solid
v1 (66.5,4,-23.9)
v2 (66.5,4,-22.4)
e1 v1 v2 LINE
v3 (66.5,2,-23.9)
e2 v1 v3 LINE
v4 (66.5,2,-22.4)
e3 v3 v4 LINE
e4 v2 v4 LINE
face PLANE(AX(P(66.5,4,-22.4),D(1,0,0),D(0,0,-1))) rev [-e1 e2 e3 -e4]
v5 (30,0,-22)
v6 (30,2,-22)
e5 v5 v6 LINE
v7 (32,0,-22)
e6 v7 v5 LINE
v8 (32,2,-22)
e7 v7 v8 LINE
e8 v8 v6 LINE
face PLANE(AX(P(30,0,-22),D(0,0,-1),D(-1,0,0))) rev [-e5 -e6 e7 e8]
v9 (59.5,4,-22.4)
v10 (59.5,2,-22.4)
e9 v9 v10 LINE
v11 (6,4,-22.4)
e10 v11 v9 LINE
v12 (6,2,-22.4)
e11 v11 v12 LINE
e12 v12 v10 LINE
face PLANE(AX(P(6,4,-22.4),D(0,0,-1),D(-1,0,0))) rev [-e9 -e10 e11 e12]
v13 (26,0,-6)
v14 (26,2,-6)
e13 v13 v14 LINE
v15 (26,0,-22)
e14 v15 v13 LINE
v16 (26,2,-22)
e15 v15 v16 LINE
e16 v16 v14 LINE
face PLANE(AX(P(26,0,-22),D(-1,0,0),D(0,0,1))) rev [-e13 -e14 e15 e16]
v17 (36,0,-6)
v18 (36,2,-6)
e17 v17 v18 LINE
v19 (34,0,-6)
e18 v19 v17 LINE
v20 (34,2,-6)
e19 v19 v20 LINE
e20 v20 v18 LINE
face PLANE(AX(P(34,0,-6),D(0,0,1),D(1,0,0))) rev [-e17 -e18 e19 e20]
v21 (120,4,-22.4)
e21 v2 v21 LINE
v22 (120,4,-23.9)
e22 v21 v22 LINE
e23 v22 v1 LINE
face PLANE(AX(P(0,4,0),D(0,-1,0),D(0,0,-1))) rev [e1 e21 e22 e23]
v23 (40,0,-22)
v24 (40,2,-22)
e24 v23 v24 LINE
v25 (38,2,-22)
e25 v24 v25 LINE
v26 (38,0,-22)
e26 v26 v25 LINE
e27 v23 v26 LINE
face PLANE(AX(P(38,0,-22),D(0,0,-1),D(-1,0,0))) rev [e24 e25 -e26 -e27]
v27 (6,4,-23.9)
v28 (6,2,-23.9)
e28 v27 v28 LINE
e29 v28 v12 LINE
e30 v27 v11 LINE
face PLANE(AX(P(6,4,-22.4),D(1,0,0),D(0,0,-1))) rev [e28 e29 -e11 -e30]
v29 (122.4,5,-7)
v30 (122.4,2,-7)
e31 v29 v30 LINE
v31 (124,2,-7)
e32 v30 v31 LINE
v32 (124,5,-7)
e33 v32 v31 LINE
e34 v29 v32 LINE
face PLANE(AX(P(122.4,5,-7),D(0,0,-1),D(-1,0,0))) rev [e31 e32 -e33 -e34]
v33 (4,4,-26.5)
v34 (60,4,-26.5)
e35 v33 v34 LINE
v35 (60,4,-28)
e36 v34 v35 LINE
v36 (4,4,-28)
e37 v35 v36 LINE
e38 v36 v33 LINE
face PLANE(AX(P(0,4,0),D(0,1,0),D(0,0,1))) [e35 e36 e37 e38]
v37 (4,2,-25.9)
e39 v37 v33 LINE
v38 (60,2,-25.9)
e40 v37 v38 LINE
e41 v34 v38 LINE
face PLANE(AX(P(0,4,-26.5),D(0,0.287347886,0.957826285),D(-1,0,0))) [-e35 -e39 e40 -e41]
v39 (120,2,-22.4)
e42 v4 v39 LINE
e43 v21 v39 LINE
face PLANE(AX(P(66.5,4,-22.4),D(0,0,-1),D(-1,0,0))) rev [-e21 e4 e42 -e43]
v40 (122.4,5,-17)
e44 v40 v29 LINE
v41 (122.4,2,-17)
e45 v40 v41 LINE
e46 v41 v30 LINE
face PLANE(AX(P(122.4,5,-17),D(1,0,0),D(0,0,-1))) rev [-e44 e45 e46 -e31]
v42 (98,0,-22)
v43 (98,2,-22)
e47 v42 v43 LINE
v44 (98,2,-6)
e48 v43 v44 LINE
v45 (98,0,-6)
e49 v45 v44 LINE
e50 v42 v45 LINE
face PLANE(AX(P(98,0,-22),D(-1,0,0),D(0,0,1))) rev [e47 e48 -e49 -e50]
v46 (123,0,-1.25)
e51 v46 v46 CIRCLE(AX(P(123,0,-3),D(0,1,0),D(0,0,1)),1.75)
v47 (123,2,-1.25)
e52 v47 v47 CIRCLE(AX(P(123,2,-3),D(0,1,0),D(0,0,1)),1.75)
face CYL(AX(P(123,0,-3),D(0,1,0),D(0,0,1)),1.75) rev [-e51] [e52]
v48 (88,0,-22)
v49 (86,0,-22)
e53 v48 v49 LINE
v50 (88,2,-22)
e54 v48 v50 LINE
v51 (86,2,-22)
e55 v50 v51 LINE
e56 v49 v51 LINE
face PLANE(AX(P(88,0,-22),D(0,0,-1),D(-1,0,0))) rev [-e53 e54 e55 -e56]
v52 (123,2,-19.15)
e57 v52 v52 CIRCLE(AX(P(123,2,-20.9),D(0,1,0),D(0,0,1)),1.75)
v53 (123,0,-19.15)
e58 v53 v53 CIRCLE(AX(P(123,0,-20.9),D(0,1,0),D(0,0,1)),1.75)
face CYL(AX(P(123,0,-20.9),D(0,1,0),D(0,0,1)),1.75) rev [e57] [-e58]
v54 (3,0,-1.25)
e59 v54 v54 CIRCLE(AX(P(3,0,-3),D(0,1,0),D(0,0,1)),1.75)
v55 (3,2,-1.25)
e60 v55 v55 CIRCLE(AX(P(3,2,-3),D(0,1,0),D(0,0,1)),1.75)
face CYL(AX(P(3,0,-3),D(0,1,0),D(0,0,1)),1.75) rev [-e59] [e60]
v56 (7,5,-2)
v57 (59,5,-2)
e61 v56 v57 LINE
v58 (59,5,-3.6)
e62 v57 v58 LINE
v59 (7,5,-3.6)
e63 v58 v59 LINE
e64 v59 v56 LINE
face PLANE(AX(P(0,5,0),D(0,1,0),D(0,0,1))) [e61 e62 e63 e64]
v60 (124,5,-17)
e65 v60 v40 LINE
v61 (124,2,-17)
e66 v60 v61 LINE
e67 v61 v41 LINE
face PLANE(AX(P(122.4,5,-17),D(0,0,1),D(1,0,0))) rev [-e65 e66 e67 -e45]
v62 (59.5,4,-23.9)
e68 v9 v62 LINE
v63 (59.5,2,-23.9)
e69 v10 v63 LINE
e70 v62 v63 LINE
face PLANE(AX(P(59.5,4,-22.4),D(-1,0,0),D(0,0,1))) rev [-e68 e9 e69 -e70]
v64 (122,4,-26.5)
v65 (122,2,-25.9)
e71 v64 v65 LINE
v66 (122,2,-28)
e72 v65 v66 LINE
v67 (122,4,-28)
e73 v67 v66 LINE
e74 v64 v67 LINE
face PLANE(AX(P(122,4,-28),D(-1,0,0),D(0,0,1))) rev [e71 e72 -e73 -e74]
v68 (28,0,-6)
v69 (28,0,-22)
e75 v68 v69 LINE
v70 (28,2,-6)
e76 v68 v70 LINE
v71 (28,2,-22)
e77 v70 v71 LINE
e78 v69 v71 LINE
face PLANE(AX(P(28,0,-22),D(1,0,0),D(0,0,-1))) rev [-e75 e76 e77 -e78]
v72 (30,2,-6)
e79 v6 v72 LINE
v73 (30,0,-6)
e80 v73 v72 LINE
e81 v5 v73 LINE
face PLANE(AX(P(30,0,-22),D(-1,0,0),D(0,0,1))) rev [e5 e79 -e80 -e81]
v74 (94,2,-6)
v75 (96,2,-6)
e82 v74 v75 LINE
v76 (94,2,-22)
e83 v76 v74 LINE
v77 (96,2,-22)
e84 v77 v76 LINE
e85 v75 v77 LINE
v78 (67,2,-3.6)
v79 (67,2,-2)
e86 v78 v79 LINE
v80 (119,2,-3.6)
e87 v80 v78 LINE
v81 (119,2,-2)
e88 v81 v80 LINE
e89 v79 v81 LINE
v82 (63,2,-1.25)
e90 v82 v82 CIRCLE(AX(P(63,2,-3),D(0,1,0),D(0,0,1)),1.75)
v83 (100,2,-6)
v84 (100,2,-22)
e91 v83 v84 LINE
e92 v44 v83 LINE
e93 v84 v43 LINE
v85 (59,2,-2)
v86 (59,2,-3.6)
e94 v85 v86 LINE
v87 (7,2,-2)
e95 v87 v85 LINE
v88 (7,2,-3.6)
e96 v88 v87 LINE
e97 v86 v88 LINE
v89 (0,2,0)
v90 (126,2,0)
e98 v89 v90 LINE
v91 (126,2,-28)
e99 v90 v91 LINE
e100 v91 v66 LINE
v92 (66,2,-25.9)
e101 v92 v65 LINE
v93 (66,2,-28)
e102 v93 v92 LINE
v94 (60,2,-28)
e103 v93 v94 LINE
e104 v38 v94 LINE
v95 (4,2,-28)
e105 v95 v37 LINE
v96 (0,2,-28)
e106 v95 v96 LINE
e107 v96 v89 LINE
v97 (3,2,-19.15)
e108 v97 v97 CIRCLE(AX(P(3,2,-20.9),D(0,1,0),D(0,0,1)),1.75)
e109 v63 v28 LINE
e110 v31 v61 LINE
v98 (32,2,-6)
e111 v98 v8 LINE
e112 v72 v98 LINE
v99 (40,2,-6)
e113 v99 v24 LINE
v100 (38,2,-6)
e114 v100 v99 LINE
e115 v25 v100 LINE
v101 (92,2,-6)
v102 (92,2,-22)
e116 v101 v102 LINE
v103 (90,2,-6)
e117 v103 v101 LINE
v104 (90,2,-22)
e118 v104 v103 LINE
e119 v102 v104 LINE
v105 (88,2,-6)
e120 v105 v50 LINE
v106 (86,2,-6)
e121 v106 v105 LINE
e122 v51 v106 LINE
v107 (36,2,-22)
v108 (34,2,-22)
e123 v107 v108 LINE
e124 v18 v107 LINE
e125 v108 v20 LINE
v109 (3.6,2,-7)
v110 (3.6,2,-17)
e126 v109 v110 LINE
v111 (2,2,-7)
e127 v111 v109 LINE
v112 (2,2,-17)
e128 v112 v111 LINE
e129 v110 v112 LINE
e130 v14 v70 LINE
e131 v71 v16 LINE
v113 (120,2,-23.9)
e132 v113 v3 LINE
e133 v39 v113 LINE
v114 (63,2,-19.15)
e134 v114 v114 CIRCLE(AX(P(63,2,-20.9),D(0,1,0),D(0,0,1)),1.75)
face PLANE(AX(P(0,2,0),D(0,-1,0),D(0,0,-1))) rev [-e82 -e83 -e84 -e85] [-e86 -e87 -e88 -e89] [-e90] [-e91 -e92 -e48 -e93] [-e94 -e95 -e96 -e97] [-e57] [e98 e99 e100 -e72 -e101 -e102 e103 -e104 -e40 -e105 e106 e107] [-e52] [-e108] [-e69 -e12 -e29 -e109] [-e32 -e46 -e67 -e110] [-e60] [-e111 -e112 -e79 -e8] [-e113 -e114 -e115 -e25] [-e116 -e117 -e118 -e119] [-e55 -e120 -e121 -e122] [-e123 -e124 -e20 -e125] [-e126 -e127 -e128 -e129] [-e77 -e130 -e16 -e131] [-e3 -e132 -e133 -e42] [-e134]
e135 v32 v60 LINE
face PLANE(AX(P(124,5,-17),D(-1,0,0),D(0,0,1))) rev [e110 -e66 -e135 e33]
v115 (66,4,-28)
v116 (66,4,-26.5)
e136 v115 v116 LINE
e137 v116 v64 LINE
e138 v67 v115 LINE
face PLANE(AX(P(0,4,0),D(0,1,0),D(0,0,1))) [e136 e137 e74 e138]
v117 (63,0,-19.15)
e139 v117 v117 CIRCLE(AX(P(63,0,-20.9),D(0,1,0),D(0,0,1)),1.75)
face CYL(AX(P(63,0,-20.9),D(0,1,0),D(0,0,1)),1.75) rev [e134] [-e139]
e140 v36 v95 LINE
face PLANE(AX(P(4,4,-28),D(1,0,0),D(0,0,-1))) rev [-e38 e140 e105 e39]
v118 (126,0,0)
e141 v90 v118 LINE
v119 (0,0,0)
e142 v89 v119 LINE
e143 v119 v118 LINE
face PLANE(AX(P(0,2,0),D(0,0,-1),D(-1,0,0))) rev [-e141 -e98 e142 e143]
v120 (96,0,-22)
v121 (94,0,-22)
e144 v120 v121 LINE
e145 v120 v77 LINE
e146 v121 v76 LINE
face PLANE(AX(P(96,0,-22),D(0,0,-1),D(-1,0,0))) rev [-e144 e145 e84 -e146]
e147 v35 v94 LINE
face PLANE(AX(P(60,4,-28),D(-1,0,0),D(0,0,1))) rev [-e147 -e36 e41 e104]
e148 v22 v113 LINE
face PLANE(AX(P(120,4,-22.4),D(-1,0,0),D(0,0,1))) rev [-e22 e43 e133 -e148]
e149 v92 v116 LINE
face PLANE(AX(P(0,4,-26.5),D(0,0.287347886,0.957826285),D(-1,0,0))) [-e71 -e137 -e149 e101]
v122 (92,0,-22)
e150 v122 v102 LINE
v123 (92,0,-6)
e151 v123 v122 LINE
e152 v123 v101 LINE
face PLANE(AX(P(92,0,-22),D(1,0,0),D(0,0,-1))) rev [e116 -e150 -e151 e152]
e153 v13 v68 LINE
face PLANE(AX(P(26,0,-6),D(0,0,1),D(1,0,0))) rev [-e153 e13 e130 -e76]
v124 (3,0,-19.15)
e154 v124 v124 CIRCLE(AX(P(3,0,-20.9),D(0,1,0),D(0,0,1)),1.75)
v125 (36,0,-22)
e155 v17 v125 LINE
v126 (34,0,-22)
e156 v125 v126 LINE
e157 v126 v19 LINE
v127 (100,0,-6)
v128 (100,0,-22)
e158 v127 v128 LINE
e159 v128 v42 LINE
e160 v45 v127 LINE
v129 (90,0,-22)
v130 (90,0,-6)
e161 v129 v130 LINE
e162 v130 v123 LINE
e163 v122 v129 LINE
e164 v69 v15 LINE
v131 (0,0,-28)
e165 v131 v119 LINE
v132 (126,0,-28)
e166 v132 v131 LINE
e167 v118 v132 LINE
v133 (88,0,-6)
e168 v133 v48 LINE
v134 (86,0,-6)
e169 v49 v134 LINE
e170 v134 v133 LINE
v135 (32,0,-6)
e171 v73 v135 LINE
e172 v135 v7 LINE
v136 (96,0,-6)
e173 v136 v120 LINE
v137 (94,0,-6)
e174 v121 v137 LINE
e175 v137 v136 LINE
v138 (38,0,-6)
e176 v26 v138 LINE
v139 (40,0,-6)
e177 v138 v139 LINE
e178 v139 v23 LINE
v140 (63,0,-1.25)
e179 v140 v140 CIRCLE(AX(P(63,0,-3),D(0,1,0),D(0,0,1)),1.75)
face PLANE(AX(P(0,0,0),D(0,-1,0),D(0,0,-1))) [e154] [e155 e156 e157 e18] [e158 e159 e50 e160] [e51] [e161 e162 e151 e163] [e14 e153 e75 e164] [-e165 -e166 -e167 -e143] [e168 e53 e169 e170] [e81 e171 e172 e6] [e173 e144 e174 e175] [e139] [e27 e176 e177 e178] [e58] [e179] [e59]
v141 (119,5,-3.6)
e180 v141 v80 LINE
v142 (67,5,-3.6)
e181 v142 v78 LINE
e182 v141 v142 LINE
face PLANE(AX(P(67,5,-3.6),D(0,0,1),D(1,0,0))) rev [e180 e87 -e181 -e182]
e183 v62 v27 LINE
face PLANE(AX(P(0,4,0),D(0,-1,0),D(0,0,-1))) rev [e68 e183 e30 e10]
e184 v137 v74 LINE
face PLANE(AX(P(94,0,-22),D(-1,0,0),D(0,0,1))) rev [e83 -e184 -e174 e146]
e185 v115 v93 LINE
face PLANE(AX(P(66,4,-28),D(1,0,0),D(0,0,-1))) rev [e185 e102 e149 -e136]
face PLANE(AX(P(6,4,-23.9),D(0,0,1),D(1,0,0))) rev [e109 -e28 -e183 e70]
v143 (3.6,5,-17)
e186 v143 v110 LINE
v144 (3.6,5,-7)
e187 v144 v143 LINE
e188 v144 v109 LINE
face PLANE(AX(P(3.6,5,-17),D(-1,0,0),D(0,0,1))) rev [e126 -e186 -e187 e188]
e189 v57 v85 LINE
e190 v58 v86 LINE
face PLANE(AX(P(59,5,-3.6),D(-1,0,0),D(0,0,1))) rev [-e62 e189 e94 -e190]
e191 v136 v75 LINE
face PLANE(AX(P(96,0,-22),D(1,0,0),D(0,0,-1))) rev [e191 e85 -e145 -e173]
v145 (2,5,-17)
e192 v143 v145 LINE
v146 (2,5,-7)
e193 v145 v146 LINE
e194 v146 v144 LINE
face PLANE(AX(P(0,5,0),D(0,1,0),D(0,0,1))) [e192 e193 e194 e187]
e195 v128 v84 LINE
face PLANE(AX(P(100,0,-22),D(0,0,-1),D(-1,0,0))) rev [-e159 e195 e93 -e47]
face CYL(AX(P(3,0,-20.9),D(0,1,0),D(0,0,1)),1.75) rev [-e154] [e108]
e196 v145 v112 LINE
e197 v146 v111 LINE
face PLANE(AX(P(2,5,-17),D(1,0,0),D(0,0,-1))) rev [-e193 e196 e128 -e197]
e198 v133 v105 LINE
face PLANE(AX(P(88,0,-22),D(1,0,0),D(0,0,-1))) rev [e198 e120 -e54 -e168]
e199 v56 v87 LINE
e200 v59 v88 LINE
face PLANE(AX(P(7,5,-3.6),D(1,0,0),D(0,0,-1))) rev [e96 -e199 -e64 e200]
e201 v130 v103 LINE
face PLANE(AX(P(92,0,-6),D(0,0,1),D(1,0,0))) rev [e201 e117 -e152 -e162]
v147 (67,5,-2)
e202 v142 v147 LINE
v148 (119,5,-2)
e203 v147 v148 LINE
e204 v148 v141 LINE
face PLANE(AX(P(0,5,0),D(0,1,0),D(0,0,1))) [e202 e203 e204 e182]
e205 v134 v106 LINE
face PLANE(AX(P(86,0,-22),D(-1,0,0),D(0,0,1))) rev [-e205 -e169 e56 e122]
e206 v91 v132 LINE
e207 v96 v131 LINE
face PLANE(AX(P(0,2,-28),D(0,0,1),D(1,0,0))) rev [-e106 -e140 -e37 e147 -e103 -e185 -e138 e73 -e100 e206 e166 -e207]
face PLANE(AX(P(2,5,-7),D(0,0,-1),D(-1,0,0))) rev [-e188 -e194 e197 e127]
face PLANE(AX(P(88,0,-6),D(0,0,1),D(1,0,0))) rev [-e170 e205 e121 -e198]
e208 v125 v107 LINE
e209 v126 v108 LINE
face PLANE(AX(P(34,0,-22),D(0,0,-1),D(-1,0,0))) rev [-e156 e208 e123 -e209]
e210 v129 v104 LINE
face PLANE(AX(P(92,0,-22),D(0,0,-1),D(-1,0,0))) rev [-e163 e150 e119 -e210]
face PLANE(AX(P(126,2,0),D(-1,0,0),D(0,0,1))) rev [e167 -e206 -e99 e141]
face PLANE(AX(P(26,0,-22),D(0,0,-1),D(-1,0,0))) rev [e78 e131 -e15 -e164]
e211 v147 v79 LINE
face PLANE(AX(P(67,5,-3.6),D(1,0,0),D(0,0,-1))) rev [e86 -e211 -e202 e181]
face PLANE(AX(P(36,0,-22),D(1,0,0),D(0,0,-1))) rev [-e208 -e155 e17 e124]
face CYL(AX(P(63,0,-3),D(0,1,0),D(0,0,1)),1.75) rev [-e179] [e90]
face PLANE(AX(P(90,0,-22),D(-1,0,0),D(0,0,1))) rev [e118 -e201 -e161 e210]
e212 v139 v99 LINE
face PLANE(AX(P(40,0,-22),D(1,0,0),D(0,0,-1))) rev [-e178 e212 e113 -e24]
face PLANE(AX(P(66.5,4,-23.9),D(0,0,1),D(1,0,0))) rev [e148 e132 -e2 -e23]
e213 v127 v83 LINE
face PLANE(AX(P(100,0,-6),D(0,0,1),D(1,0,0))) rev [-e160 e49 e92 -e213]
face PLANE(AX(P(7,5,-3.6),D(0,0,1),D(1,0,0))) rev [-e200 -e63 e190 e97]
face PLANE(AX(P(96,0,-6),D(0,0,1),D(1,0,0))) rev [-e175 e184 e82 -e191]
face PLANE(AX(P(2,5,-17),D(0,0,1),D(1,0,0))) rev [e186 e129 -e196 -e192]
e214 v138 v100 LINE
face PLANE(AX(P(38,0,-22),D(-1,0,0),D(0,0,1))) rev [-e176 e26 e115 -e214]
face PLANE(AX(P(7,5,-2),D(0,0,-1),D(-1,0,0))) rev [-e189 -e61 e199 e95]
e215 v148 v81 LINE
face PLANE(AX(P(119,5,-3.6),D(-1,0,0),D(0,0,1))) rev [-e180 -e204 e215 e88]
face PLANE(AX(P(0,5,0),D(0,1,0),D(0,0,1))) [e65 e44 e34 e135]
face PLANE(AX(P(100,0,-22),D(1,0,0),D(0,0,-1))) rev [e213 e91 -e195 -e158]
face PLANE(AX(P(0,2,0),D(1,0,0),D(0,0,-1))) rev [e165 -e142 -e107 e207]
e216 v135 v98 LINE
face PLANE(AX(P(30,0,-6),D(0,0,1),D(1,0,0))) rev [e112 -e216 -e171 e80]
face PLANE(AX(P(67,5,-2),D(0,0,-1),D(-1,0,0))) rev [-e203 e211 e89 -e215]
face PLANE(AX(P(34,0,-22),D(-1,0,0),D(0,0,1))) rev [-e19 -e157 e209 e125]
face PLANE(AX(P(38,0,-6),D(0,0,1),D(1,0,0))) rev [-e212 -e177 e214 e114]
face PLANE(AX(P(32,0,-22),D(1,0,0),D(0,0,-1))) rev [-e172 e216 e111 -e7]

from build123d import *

# Parameters (mm, degrees)
SKIZZE1_W                       = 126
SKIZZE1_H                       = 28
AUFSATZ_LINEAR_AUSTRAGEN1_DEPTH = 2
SKIZZE2_R                       = 1.75
SCHNITT_LINEAR_AUSTRAGEN1_DEPTH = 130.089116505
SKIZZE3_W                       = 2
SKIZZE3_H                       = 16
SCHNITT_LINEAR_AUSTRAGEN2_DEPTH = 130.089116505
LINEARES_MUSTER1_COUNT          = 4
LINEARES_MUSTER1_PITCH          = 4
SKIZZE4_W                       = 2
SKIZZE4_H                       = 16
SCHNITT_LINEAR_AUSTRAGEN3_DEPTH = 130.089116505
LINEARES_MUSTER2_COUNT          = 4
LINEARES_MUSTER2_PITCH          = 4
SKIZZE5_W                       = 1.6
SKIZZE5_H                       = 10
SKIZZE5_W_2                     = 52
SKIZZE5_H_2                     = 1.6
AUFSATZ_LINEAR_AUSTRAGEN2_DEPTH = 3
SKIZZE6_W                       = 53.5
SKIZZE6_H                       = 1.5
AUFSATZ_LINEAR_AUSTRAGEN3_DEPTH = 2
SKIZZE7_W                       = 56
SKIZZE7_H                       = 2.1
AUFSATZ_LINEAR_AUSTRAGEN4_DEPTH = 2
FASE1_SIZE                      = 2
FASE1_SIZE_2                    = 0.6


with BuildPart() as part:
    # Skizze1 → Aufsatz-Linear austragen1 (new body)
    with BuildSketch(Plane(origin=(0, 0, 0), x_dir=(1, 0, 0), z_dir=(0, 1, 0))):
        with Locations((63, 14)):
            Rectangle(SKIZZE1_W, SKIZZE1_H)
    extrude(amount=AUFSATZ_LINEAR_AUSTRAGEN1_DEPTH)

    # Skizze2 → Schnitt-Linear austragen1 (cut, through all)
    with BuildSketch(Plane(origin=(0, 2, 0), x_dir=(1, 0, 0), z_dir=(0, 1, 0))):
        with Locations(Location((3, 3, 0), (0, 0, 270))):
            Circle(SKIZZE2_R)
        with Locations(Location((3, 20.9, 0), (0, 0, 270))):
            Circle(SKIZZE2_R)
        with Locations(Location((63, 3, 0), (0, 0, 270))):
            Circle(SKIZZE2_R)
        with Locations(Location((63, 20.9, 0), (0, 0, 270))):
            Circle(SKIZZE2_R)
        with Locations(Location((123, 20.9, 0), (0, 0, 270))):
            Circle(SKIZZE2_R)
        with Locations(Location((123, 3, 0), (0, 0, 270))):
            Circle(SKIZZE2_R)
    extrude(amount=-SCHNITT_LINEAR_AUSTRAGEN1_DEPTH, mode=Mode.SUBTRACT)

    # Skizze3 → Schnitt-Linear austragen2 (cut, through all)
    with BuildSketch(Plane(origin=(0, 2, 0), x_dir=(1, 0, 0), z_dir=(0, 1, 0))):
        with Locations((27, 14)):
            Rectangle(SKIZZE3_W, SKIZZE3_H)
    schnitt_linear_austragen2 = extrude(amount=-SCHNITT_LINEAR_AUSTRAGEN2_DEPTH, mode=Mode.SUBTRACT)

    # Lineares Muster1: Schnitt-Linear austragen2 ×4
    with Locations(*[(i * LINEARES_MUSTER1_PITCH, 0, 0) for i in range(1, LINEARES_MUSTER1_COUNT)]):
        add(schnitt_linear_austragen2, mode=Mode.SUBTRACT)

    # Skizze4 → Schnitt-Linear austragen3 (cut, through all)
    with BuildSketch(Plane(origin=(0, 2, 0), x_dir=(1, 0, 0), z_dir=(0, 1, 0))):
        with Locations((99, 14)):
            Rectangle(SKIZZE4_W, SKIZZE4_H)
    schnitt_linear_austragen3 = extrude(amount=-SCHNITT_LINEAR_AUSTRAGEN3_DEPTH, mode=Mode.SUBTRACT)

    # Lineares Muster2: Schnitt-Linear austragen3 ×4
    with Locations(*[(-i * LINEARES_MUSTER2_PITCH, 0, 0) for i in range(1, LINEARES_MUSTER2_COUNT)]):
        add(schnitt_linear_austragen3, mode=Mode.SUBTRACT)

    # Skizze5 → Aufsatz-Linear austragen2 (add)
    with BuildSketch(Plane(origin=(0, 2, 0), x_dir=(1, 0, 0), z_dir=(0, 1, 0))):
        with Locations((2.8, 12)):
            Rectangle(SKIZZE5_W, SKIZZE5_H)
        with Locations((33, 2.8)):
            Rectangle(SKIZZE5_W_2, SKIZZE5_H_2)
        with Locations((93, 2.8)):
            Rectangle(SKIZZE5_W_2, SKIZZE5_H_2)
        with Locations((123.2, 12)):
            Rectangle(SKIZZE5_W, SKIZZE5_H)
    extrude(amount=AUFSATZ_LINEAR_AUSTRAGEN2_DEPTH)

    # Skizze6 → Aufsatz-Linear austragen3 (add)
    with BuildSketch(Plane(origin=(0, 2, 0), x_dir=(1, 0, 0), z_dir=(0, 1, 0))):
        with Locations((32.75, 23.15)):
            Rectangle(SKIZZE6_W, SKIZZE6_H)
        with Locations((93.25, 23.15)):
            Rectangle(SKIZZE6_W, SKIZZE6_H)
    extrude(amount=AUFSATZ_LINEAR_AUSTRAGEN3_DEPTH)

    # Skizze7 → Aufsatz-Linear austragen4 (add)
    with BuildSketch(Plane(origin=(0, 2, 0), x_dir=(1, 0, 0), z_dir=(0, 1, 0))):
        with Locations((32, 26.95)):
            Rectangle(SKIZZE7_W, SKIZZE7_H)
        with Locations((94, 26.95)):
            Rectangle(SKIZZE7_W, SKIZZE7_H)
    extrude(amount=AUFSATZ_LINEAR_AUSTRAGEN4_DEPTH)

    # Fase1
    # the kernel refuses this chamfer: 2, 0.6 mm, written as the material it takes off along each edge
    with BuildSketch(Plane(origin=(127.191883336, 4, -25.9), x_dir=(0, -0.9999387354199845, 0.011069119507991545), z_dir=(-1, 0, 0))) as fase1_piece_1_section:
        Polygon((FASE1_SIZE * 0.99993873542, -FASE1_SIZE * 0.011069119508), (-FASE1_SIZE_2 * 0.011069119508, -FASE1_SIZE_2 * 0.99993873542), (0, 0), align=None)
    fase1_piece_1 = extrude(amount=66.383766671, mode=Mode.PRIVATE)
    fase1_piece_1 = split(fase1_piece_1, bisect_by=Plane(origin=(94, 2, -26.081095953), z_dir=(0, 1, 0)), keep=Keep.TOP, mode=Mode.PRIVATE)
    add(fase1_piece_1, mode=Mode.SUBTRACT)
    with BuildSketch(Plane(origin=(65.191883336, 4, -25.9), x_dir=(0, -0.9999387354199845, 0.011069119507991545), z_dir=(-1, 0, 0))) as fase1_piece_2_section:
        Polygon((FASE1_SIZE * 0.99993873542, -FASE1_SIZE * 0.011069119508), (-FASE1_SIZE_2 * 0.011069119508, -FASE1_SIZE_2 * 0.99993873542), (0, 0), align=None)
    fase1_piece_2 = extrude(amount=66.383766671, mode=Mode.PRIVATE)
    fase1_piece_2 = split(fase1_piece_2, bisect_by=Plane(origin=(32, 2, -26.081095953), z_dir=(0, 1, 0)), keep=Keep.TOP, mode=Mode.PRIVATE)
    add(fase1_piece_2, mode=Mode.SUBTRACT)


solid = part.part
